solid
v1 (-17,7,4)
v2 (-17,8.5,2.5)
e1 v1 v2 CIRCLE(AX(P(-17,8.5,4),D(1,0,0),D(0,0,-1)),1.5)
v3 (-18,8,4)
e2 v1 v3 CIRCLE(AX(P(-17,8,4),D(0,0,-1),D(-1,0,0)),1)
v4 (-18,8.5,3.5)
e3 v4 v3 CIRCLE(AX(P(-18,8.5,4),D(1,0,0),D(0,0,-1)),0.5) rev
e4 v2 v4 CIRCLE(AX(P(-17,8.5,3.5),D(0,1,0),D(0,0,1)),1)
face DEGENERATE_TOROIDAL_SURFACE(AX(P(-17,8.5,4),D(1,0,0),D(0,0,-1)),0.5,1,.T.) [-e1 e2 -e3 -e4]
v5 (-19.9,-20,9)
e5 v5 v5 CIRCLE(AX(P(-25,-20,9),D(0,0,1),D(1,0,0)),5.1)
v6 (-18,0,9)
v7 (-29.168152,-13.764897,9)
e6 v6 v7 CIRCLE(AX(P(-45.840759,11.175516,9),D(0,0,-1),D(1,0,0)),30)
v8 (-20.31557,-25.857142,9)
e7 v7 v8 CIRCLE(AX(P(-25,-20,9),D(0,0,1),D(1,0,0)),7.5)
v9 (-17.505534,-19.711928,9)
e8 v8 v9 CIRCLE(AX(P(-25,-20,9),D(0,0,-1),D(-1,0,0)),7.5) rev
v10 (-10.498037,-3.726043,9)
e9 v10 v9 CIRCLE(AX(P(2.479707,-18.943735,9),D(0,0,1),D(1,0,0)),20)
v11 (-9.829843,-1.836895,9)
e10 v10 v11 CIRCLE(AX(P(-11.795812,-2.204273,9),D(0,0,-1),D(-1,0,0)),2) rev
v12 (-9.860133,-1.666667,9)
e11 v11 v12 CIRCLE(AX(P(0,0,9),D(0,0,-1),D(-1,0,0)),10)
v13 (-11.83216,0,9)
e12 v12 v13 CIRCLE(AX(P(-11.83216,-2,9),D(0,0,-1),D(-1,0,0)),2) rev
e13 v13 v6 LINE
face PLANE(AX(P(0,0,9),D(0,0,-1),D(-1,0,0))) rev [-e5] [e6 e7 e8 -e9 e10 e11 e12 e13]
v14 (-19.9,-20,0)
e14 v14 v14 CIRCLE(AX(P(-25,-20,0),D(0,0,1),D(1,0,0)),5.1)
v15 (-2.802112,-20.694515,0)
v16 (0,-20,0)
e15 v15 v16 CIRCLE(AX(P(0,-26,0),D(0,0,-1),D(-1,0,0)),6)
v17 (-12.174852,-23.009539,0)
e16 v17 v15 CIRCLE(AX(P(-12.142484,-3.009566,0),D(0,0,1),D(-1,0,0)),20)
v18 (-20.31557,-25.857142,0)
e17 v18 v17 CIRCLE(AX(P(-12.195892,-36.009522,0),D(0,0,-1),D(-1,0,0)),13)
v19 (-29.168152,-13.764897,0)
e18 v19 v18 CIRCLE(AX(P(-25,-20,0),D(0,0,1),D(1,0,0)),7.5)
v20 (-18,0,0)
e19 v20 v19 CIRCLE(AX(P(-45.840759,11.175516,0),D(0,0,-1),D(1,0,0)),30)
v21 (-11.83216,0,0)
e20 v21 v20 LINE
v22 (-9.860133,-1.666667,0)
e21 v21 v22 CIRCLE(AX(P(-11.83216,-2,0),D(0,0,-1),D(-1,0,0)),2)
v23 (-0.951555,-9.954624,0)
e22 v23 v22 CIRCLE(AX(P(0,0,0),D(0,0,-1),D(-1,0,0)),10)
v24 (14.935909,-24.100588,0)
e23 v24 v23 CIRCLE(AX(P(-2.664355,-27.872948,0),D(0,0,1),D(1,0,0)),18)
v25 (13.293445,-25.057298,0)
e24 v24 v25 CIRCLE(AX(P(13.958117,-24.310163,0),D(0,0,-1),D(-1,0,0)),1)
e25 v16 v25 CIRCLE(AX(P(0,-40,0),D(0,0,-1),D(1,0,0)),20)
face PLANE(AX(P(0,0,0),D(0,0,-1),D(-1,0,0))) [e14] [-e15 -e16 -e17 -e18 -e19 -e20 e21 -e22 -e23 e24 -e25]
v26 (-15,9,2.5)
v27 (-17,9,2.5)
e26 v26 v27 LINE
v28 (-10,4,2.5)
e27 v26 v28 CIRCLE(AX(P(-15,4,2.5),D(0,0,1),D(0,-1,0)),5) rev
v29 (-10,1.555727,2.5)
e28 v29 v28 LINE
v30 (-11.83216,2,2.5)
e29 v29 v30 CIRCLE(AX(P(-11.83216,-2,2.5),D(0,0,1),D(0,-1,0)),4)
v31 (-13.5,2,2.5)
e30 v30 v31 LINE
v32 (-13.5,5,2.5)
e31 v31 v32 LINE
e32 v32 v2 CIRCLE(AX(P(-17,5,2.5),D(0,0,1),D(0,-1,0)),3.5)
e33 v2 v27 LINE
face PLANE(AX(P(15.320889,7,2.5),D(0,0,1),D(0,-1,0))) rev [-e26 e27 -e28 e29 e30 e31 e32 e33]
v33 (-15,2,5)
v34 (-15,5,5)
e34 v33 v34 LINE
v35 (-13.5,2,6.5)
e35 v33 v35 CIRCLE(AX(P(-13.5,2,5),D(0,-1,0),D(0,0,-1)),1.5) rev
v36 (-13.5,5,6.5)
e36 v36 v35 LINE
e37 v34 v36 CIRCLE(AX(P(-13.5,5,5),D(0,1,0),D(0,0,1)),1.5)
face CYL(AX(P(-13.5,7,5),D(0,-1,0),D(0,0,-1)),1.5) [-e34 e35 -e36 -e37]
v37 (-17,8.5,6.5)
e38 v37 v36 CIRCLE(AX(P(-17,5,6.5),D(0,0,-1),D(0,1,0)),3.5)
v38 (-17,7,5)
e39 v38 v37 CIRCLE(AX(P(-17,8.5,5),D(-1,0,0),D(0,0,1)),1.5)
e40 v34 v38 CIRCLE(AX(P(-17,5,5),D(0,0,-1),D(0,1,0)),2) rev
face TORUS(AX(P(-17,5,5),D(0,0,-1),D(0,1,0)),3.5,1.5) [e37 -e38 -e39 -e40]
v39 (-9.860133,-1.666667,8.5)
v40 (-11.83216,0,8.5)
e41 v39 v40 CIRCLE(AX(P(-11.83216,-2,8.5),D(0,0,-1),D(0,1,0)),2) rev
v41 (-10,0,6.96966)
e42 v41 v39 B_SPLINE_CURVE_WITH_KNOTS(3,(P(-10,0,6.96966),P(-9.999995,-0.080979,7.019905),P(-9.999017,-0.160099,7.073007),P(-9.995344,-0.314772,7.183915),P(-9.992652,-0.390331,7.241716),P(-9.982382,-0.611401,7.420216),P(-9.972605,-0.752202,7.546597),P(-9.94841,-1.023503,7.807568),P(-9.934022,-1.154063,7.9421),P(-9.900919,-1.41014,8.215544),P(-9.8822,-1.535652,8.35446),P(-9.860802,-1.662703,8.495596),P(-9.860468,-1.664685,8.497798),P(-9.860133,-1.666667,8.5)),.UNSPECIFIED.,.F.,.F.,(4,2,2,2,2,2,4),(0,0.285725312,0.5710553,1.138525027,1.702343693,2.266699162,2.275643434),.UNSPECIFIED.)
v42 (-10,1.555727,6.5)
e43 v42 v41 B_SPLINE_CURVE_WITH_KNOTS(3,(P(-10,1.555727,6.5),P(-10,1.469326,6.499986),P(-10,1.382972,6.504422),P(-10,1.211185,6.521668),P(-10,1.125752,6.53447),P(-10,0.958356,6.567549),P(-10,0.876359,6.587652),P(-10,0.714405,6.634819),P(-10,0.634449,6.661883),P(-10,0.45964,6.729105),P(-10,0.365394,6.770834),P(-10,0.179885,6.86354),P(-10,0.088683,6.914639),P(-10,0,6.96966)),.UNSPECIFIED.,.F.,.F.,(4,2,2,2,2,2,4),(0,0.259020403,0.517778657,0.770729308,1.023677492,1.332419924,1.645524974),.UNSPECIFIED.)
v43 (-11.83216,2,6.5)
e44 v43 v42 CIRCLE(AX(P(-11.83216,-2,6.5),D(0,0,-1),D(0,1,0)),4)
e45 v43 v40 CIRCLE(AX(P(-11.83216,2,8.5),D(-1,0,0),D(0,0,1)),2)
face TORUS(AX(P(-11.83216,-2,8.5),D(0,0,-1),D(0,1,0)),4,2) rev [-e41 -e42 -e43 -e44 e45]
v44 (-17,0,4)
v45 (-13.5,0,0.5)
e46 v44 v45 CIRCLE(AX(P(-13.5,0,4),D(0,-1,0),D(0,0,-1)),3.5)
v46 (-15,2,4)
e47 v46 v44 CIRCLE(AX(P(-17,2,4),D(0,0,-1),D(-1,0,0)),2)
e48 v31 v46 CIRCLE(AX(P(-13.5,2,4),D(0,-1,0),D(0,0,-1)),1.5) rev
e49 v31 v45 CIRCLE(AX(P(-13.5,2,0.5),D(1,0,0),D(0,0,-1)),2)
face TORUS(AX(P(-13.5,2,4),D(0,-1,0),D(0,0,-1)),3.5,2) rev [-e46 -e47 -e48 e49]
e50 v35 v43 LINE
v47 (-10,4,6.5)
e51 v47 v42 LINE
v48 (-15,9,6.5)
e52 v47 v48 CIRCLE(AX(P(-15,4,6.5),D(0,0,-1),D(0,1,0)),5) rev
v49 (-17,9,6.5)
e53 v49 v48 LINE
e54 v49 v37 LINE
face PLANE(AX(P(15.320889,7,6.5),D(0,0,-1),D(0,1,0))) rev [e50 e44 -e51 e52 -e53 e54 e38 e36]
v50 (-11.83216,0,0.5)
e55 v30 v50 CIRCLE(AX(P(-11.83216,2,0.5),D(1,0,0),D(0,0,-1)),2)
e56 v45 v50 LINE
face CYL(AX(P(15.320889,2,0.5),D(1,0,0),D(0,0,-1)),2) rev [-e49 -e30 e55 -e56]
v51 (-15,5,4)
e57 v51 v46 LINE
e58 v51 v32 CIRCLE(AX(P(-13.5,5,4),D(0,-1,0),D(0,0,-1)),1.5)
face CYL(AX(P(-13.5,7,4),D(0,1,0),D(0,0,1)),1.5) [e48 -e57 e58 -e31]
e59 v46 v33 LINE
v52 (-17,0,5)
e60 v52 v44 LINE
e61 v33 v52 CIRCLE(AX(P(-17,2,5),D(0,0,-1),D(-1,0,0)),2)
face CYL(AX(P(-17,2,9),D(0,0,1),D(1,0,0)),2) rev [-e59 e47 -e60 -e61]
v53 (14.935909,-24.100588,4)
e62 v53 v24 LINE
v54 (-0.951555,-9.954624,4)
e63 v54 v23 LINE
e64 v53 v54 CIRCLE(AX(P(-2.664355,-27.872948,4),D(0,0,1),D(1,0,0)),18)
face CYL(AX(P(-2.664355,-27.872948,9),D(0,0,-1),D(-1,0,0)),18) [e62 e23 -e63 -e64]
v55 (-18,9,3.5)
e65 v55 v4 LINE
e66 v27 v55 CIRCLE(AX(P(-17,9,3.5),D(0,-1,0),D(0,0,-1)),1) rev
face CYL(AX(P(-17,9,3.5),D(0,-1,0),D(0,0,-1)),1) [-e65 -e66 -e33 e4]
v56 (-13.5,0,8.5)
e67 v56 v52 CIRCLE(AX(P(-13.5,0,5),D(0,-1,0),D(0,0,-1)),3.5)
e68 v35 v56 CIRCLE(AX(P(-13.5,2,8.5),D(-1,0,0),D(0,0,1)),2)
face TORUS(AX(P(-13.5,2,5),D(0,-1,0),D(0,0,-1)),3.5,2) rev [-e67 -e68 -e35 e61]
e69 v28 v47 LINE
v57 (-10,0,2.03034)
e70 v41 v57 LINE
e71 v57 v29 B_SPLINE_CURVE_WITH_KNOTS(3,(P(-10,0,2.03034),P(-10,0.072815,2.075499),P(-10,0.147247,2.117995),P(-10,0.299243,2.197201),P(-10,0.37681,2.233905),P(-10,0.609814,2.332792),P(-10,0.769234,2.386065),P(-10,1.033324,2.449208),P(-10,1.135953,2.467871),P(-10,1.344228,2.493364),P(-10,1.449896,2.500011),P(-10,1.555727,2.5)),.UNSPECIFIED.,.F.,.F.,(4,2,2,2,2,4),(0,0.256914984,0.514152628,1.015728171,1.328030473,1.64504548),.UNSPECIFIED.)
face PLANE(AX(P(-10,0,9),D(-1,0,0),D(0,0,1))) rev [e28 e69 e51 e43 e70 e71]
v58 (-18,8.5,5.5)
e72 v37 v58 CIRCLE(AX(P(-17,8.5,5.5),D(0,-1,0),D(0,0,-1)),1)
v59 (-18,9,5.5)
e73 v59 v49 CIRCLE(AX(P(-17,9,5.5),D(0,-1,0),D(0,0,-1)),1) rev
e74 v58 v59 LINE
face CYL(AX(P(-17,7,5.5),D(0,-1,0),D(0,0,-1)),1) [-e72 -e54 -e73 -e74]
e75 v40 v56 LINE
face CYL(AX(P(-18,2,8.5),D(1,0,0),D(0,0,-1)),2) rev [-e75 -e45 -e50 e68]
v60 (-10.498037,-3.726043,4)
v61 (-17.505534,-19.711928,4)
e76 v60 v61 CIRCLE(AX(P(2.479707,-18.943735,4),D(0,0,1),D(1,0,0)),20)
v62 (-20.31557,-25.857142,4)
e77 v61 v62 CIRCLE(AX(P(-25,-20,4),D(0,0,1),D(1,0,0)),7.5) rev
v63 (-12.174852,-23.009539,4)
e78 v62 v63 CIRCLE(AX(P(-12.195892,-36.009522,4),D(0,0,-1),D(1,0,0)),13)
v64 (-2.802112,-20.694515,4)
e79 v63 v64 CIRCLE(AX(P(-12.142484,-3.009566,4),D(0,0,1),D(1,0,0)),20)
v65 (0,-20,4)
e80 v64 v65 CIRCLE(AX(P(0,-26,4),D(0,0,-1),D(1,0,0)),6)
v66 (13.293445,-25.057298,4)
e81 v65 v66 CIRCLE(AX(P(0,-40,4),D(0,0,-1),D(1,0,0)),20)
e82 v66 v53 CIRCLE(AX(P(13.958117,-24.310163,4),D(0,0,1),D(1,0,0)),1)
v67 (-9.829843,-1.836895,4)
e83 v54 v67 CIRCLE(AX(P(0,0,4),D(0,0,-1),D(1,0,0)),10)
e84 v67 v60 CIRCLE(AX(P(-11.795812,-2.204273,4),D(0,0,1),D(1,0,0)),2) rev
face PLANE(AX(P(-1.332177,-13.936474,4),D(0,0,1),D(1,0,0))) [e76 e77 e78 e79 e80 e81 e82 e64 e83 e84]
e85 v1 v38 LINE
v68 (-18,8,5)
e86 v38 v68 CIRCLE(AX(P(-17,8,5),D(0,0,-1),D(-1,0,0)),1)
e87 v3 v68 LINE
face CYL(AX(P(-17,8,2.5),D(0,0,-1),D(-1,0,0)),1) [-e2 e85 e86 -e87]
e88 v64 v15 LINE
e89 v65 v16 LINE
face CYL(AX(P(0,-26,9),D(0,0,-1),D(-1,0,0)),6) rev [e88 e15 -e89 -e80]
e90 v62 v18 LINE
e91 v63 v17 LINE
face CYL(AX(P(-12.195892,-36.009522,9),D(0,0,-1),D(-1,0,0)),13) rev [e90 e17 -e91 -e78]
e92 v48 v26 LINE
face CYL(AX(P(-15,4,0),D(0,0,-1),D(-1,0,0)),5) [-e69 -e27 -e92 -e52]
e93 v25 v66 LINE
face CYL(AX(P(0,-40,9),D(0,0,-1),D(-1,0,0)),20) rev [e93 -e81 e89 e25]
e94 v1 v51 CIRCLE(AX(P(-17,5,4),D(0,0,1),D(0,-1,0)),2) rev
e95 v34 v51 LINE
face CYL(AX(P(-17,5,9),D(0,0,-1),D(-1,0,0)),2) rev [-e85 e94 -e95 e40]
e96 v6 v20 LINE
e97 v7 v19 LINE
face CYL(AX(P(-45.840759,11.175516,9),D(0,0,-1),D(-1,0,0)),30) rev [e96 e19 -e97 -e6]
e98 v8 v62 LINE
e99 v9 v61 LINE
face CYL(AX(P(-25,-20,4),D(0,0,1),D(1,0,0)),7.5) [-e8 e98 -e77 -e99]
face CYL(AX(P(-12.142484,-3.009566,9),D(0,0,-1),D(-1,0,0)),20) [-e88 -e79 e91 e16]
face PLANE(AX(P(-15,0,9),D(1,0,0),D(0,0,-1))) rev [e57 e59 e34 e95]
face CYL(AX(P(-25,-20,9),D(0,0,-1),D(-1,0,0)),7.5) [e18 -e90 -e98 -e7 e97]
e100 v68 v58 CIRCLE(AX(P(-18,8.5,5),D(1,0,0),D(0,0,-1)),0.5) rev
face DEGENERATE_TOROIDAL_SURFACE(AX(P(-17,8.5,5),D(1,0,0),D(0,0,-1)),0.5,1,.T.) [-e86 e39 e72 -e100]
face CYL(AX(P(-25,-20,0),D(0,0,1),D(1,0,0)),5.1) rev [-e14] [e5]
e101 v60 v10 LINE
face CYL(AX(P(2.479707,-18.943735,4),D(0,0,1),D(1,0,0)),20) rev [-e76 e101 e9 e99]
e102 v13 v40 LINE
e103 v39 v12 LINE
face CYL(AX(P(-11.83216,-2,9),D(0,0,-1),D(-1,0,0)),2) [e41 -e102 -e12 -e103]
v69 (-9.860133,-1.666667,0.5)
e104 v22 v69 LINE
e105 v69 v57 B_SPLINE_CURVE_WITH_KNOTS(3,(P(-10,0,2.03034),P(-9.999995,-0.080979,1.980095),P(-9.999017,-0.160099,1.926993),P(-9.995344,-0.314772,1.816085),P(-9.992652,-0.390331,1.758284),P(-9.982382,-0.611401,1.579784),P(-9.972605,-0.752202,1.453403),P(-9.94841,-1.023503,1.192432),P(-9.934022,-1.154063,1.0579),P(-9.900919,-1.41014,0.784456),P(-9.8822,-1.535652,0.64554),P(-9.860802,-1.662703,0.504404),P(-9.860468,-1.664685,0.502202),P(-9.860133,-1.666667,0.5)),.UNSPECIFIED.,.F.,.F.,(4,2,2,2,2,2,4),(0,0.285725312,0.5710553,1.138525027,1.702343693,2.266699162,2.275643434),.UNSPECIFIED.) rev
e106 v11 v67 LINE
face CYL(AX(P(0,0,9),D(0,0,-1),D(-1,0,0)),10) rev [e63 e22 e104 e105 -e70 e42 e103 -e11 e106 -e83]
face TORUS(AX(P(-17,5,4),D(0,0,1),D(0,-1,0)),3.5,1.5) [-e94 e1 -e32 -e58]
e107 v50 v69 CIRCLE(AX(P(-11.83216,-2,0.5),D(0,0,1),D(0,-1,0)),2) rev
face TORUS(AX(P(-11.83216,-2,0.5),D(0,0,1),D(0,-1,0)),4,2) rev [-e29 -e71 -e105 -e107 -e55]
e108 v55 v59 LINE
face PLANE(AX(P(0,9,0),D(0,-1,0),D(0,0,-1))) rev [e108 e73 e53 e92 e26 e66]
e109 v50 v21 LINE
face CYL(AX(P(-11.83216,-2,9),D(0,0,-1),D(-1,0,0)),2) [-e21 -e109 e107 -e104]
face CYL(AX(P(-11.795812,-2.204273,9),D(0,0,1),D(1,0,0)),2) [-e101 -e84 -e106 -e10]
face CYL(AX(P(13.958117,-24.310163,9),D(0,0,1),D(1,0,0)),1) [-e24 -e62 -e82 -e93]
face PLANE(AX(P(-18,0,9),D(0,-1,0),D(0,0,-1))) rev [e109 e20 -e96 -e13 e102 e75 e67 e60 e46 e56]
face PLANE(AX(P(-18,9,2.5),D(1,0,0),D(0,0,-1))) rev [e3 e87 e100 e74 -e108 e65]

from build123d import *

# Parameters (mm, degrees)
EXTRUDE_1_DEPTH     = 9
CUT_EXTRUDE_START   = -5
CUT_EXTRUDE_1_DEPTH = 5
SKETCH_12_W         = 2.5
SKETCH_12_H         = 7
CUT_EXTRUDE_3_DEPTH = 42.911887352
FILLET_11_R         = 2
FILLET_1_R          = 1
SKETCH_10_W         = 8
SKETCH_10_H         = 4
EXTRUDE_3_DEPTH     = 2
FILLET_5_R          = 5
FILLET_10_R         = 7.5
FILLET_14_R         = 2
FILLET_15_R         = 1.5
FILLET_16_R         = 2
FILLET_17_R         = 1
FILLET_18_R         = 2
SKETCH_11_R         = 5.1
CUT_EXTRUDE_2_DEPTH = 44.514365603


# Some blends are built 0.0001 mm under size
with BuildPart() as part:
    # Эскиз2 → Бобышка-Вытянуть1 (new body)
    with BuildSketch(Plane.XY):
        with BuildLine():
            Line((-18, 0), (-15, 0))
            Line((-15, 0), (-15, 7))
            Line((-15, 7), (-10, 7))
            Line((-10, 7), (-10, 0))
            ThreePointArc((-10, 0), (-7.39984978, -6.726233956), (-0.951555354, -9.954624172))
            ThreePointArc((-0.951555354, -9.954624172), (10.407523967, -15.498539394), (15.320888862, -27.144247806))
            ThreePointArc((15.320888862, -27.144247806), (8.452365235, -21.873844259), (0, -20))
            ThreePointArc((0, -20), (-1.44344914, -20.176216472), (-2.802111775, -20.69451514))
            ThreePointArc((-2.802111775, -20.69451514), (-7.346697493, -22.426064476), (-12.174852362, -23.009539415))
            ThreePointArc((-12.174852362, -23.009539415), (-16.488233618, -23.738589268), (-20.315570084, -25.857142338))
            ThreePointArc((-20.315570084, -25.857142338), (-31.05163084, -24.430323259), (-29.168151763, -13.764896883))
            ThreePointArc((-29.168151763, -13.764896883), (-22.544234788, -7.726123715), (-18, 0))
        make_face()
    extrude(amount=EXTRUDE_1_DEPTH)

    # Эскиз6 → Вырез-Вытянуть1 (cut)
    with BuildSketch(Plane.XY.offset(9).offset(CUT_EXTRUDE_START)):
        with BuildLine():
            ThreePointArc((-9.55, -2.96605799), (-16.390256677, -12.316180922), (-16.898984287, -23.890078556))
            ThreePointArc((-16.898984287, -23.890078556), (-14.577958647, -23.229625817), (-12.174852362, -23.009539415))
            ThreePointArc((-12.174852362, -23.009539415), (-7.346697493, -22.426064476), (-2.802111775, -20.69451514))
            ThreePointArc((-2.802111775, -20.69451514), (-1.44344914, -20.176216472), (0, -20))
            ThreePointArc((0, -20), (8.452365235, -21.873844259), (15.320888862, -27.144247806))
            ThreePointArc((15.320888862, -27.144247806), (10.407523967, -15.498539394), (-0.951555354, -9.954624172))
            ThreePointArc((-0.951555354, -9.954624172), (-6.307192762, -7.760110789), (-9.55, -2.96605799))
        make_face()
    extrude(amount=CUT_EXTRUDE_1_DEPTH, mode=Mode.SUBTRACT)

    # Эскиз12 → Вырез-Вытянуть3 (cut, through all)
    with BuildSketch(Plane.ZY.offset(15)):
        with Locations((1.25, 3.5)):
            Rectangle(SKETCH_12_W, SKETCH_12_H)
        with Locations((7.75, 3.5)):
            Rectangle(SKETCH_12_W, SKETCH_12_H)
    extrude(amount=-CUT_EXTRUDE_3_DEPTH, mode=Mode.SUBTRACT)

    # Скругление11
    fillet_11_edges = [part.edges().sort_by_distance(p)[0] for p in [
        (-10, 0, 7.75),
        (-10, 0, 1.25),
    ]]
    fillet(fillet_11_edges, radius=FILLET_11_R)

    # Скругление1
    fillet_1_edges = [part.edges().sort_by_distance(p)[0] for p in [
        (15.320888862, -27.144247806, 2),
    ]]
    fillet(fillet_1_edges, radius=FILLET_1_R)

    # Эскиз10 → Бобышка-Вытянуть3 (add)
    with BuildSketch(Plane(origin=(0, 7, 0), x_dir=(-1, 0, 0), z_dir=(0, 1, 0))):
        with Locations((14, 4.5)):
            Rectangle(SKETCH_10_W, SKETCH_10_H)
    extrude(amount=EXTRUDE_3_DEPTH)

    # Скругление5
    fillet_5_edges = [part.edges().sort_by_distance(p)[0] for p in [
        (-10, 9, 4.5),
    ]]
    fillet(fillet_5_edges, radius=FILLET_5_R)

    # Скругление10
    fillet_10_edges = [part.edges().sort_by_distance(p)[0] for p in [
        (-16.898984287, -23.890078556, 6.5),
    ]]
    fillet(fillet_10_edges, radius=FILLET_10_R - 0.0001)  # a hair under: the kernel refuses the full size

    # Скругление14
    fillet_14_edges = [part.edges().sort_by_distance(p)[0] for p in [
        (-15, 7, 4.5),
    ]]
    fillet(fillet_14_edges, radius=FILLET_14_R)

    # Скругление15
    fillet_15_edges = [part.edges().sort_by_distance(p)[0] for p in [
        (-17.5, 7, 6.5),
        (-15, 2.5, 6.5),
        (-17.5, 7, 2.5),
        (-15.585786438, 6.414213562, 2.5),
        (-15.585786438, 6.414213562, 6.5),
        (-15, 2.5, 2.5),
    ]]
    fillet(fillet_15_edges, radius=FILLET_15_R)

    # Скругление16
    # the kernel refuses this fillet: 2 mm, written as the material it adds along each edge
    with BuildSketch(Plane(origin=(-11.832159566, -2, 6.5), x_dir=(-0.6907726827654878, -0.7230719886325089, 0), z_dir=(-0.7230719886325089, 0.6907726827654878, 0))) as fillet_16_piece_1_section:
        with BuildLine():
            CenterArc((2 + FILLET_16_R, FILLET_16_R), FILLET_16_R, 180, 90)
            Line((2, FILLET_16_R), (2, 0))
            Line((2, 0), (2 + FILLET_16_R, 0))
        make_face()
    fillet_16_piece_1 = revolve(axis=Axis((-11.832159566, -2, 6.5), (0, 0, 1)), revolution_arc=223.691304566, mode=Mode.PRIVATE)
    fillet_16_piece_1 = split(fillet_16_piece_1, bisect_by=Plane(origin=(-9.962064569, 0, 7.231915875), z_dir=(0, -1, 0)), keep=Keep.TOP, mode=Mode.PRIVATE)
    fillet_16_piece_1 = fillet_16_piece_1 - Plane(origin=(0, 0, 7.231915875), x_dir=(-1, 0, 0), z_dir=(0, 0, -1)) * Cylinder(10, 17, mode=Mode.PRIVATE)
    fillet_16_piece_1 = fillet_16_piece_1 - Plane(origin=(2.479707116, -18.943734501, 7.231915875), x_dir=(-0.6014853558135568, 0.7988838255602869, 0), z_dir=(0, 0, -1)) * Cylinder(20, 17, mode=Mode.PRIVATE)
    add(fillet_16_piece_1)
    with BuildSketch(Plane(origin=(-11.832159566, -2, 6.5), x_dir=(-0.6907726827654878, -0.7230719886325089, 0), z_dir=(-0.7230719886325089, 0.6907726827654878, 0))) as fillet_16_piece_2_section:
        with BuildLine():
            CenterArc((2 + FILLET_16_R, FILLET_16_R), FILLET_16_R, 180, 90)
            Line((2, FILLET_16_R), (2, 0))
            Line((2, 0), (2 + FILLET_16_R, 0))
        make_face()
    fillet_16_piece_2 = revolve(axis=Axis((-11.832159566, -2, 6.5), (0, 0, 1)), revolution_arc=223.691304566, mode=Mode.PRIVATE)
    fillet_16_piece_2 = split(fillet_16_piece_2, bisect_by=Plane(origin=(-11.088968436, 0, 6.841402023), z_dir=(0, 1, 0)), keep=Keep.TOP, mode=Mode.PRIVATE)
    fillet_16_piece_2 = split(fillet_16_piece_2, bisect_by=Plane(origin=(-10, 0.441530369, 6.841402023), z_dir=(-1, 0, 0)), keep=Keep.TOP, mode=Mode.PRIVATE)
    add(fillet_16_piece_2)
    with BuildSketch(Plane(origin=(-13.5, 0, 6.5), x_dir=(0, 0, 1), z_dir=(1, 0, 0))) as fillet_16_piece_3:
        with BuildLine():
            CenterArc((FILLET_16_R, -FILLET_16_R), FILLET_16_R, 90, 90)
            Line((0, -FILLET_16_R), (0, 0))
            Line((0, 0), (FILLET_16_R, 0))
        make_face()
    extrude(amount=1.667840434)
    with BuildSketch(Plane(origin=(-11.832159566, -2, 2.5), x_dir=(-0.6907726827654875, -0.7230719886325091, 0), z_dir=(-0.7230719886325091, 0.6907726827654875, 0))) as fillet_16_piece_4_section:
        with BuildLine():
            CenterArc((2 + FILLET_16_R, -FILLET_16_R), FILLET_16_R, 90, 90)
            Line((2, -FILLET_16_R), (2, 0))
            Line((2, 0), (2 + FILLET_16_R, 0))
        make_face()
    fillet_16_piece_4 = revolve(axis=Axis((-11.832159566, -2, 2.5), (0, 0, 1)), revolution_arc=223.691304566, mode=Mode.PRIVATE)
    fillet_16_piece_4 = split(fillet_16_piece_4, bisect_by=Plane(origin=(-9.962064569, 0, 1.768084125), z_dir=(0, -1, 0)), keep=Keep.TOP, mode=Mode.PRIVATE)
    fillet_16_piece_4 = fillet_16_piece_4 - Plane(origin=(0, 0, 1.768084125), x_dir=(-1, 0, 0), z_dir=(0, 0, -1)) * Cylinder(10, 17, mode=Mode.PRIVATE)
    add(fillet_16_piece_4)
    with BuildSketch(Plane(origin=(-11.832159566, -2, 2.5), x_dir=(-0.6907726827654875, -0.7230719886325091, 0), z_dir=(-0.7230719886325091, 0.6907726827654875, 0))) as fillet_16_piece_5_section:
        with BuildLine():
            CenterArc((2 + FILLET_16_R, -FILLET_16_R), FILLET_16_R, 90, 90)
            Line((2, -FILLET_16_R), (2, 0))
            Line((2, 0), (2 + FILLET_16_R, 0))
        make_face()
    fillet_16_piece_5 = revolve(axis=Axis((-11.832159566, -2, 2.5), (0, 0, 1)), revolution_arc=223.691304566, mode=Mode.PRIVATE)
    fillet_16_piece_5 = split(fillet_16_piece_5, bisect_by=Plane(origin=(-10, 0.441530341, 2.15859789), z_dir=(-1, 0, 0)), keep=Keep.TOP, mode=Mode.PRIVATE)
    add(fillet_16_piece_5)
    with BuildSketch(Plane(origin=(-13.5, 0, 2.5), x_dir=(0, 0, -1), z_dir=(1, 0, 0))) as fillet_16_piece_6:
        with BuildLine():
            CenterArc((FILLET_16_R, FILLET_16_R), FILLET_16_R, 180, 90)
            Line((0, FILLET_16_R), (0, 0))
            Line((0, 0), (FILLET_16_R, 0))
        make_face()
    extrude(amount=1.667840434)
    with BuildSketch(Plane(origin=(-13.5, 0, 4), x_dir=(0, 0, -1), z_dir=(1, 0, 0))) as fillet_16_piece_7:
        with BuildLine():
            CenterArc((1.5 + FILLET_16_R, FILLET_16_R), FILLET_16_R, 180, 90)
            Line((1.5 + FILLET_16_R, 0), (1.5, 0))
            Line((1.5, 0), (1.5, FILLET_16_R))
        make_face()
    revolve(axis=Axis((-13.5, 0, 4), (0, 1, 0)), revolution_arc=90)
    with BuildSketch(Plane(origin=(-15, 0, 4), x_dir=(0, 1, 0), z_dir=(0, 0, 1))) as fillet_16_piece_8:
        with BuildLine():
            CenterArc((FILLET_16_R, FILLET_16_R), FILLET_16_R, 180, 90)
            Line((0, FILLET_16_R), (0, 0))
            Line((0, 0), (FILLET_16_R, 0))
        make_face()
    extrude(amount=1)
    with BuildSketch(Plane(origin=(-13.5, 0, 5), x_dir=(0, 0, 1), z_dir=(1, 0, 0))) as fillet_16_piece_9:
        with BuildLine():
            CenterArc((1.5 + FILLET_16_R, -FILLET_16_R), FILLET_16_R, 90, 90)
            Line((1.5 + FILLET_16_R, 0), (1.5, 0))
            Line((1.5, 0), (1.5, -FILLET_16_R))
        make_face()
    revolve(axis=Axis((-13.5, 0, 5), (0, -1, 0)), revolution_arc=90)

    # Скругление17
    fillet_17_edges = [part.edges().sort_by_distance(p)[0] for p in [
        (-18, 8.75, 2.5),
        (-18, 7.439339828, 2.939339828),
        (-18, 7, 4.5),
        (-18, 8.75, 6.5),
        (-18, 7.439339828, 6.060660172),
    ]]
    fillet(fillet_17_edges, radius=FILLET_17_R - 0.0001)  # a hair under: the kernel refuses the full size

    # Скругление18
    fillet_18_edges = [part.edges().sort_by_distance(p)[0] for p in [
        (-9.55, -2.96605799, 5.25),
    ]]
    fillet(fillet_18_edges, radius=FILLET_18_R)

    # Эскиз11 → Вырез-Вытянуть2 (cut, through all)
    with BuildSketch(Plane.XY.offset(9)):
        with Locations((-25, -20)):
            Circle(SKETCH_11_R)
    extrude(amount=-CUT_EXTRUDE_2_DEPTH, mode=Mode.SUBTRACT)


solid = part.part
